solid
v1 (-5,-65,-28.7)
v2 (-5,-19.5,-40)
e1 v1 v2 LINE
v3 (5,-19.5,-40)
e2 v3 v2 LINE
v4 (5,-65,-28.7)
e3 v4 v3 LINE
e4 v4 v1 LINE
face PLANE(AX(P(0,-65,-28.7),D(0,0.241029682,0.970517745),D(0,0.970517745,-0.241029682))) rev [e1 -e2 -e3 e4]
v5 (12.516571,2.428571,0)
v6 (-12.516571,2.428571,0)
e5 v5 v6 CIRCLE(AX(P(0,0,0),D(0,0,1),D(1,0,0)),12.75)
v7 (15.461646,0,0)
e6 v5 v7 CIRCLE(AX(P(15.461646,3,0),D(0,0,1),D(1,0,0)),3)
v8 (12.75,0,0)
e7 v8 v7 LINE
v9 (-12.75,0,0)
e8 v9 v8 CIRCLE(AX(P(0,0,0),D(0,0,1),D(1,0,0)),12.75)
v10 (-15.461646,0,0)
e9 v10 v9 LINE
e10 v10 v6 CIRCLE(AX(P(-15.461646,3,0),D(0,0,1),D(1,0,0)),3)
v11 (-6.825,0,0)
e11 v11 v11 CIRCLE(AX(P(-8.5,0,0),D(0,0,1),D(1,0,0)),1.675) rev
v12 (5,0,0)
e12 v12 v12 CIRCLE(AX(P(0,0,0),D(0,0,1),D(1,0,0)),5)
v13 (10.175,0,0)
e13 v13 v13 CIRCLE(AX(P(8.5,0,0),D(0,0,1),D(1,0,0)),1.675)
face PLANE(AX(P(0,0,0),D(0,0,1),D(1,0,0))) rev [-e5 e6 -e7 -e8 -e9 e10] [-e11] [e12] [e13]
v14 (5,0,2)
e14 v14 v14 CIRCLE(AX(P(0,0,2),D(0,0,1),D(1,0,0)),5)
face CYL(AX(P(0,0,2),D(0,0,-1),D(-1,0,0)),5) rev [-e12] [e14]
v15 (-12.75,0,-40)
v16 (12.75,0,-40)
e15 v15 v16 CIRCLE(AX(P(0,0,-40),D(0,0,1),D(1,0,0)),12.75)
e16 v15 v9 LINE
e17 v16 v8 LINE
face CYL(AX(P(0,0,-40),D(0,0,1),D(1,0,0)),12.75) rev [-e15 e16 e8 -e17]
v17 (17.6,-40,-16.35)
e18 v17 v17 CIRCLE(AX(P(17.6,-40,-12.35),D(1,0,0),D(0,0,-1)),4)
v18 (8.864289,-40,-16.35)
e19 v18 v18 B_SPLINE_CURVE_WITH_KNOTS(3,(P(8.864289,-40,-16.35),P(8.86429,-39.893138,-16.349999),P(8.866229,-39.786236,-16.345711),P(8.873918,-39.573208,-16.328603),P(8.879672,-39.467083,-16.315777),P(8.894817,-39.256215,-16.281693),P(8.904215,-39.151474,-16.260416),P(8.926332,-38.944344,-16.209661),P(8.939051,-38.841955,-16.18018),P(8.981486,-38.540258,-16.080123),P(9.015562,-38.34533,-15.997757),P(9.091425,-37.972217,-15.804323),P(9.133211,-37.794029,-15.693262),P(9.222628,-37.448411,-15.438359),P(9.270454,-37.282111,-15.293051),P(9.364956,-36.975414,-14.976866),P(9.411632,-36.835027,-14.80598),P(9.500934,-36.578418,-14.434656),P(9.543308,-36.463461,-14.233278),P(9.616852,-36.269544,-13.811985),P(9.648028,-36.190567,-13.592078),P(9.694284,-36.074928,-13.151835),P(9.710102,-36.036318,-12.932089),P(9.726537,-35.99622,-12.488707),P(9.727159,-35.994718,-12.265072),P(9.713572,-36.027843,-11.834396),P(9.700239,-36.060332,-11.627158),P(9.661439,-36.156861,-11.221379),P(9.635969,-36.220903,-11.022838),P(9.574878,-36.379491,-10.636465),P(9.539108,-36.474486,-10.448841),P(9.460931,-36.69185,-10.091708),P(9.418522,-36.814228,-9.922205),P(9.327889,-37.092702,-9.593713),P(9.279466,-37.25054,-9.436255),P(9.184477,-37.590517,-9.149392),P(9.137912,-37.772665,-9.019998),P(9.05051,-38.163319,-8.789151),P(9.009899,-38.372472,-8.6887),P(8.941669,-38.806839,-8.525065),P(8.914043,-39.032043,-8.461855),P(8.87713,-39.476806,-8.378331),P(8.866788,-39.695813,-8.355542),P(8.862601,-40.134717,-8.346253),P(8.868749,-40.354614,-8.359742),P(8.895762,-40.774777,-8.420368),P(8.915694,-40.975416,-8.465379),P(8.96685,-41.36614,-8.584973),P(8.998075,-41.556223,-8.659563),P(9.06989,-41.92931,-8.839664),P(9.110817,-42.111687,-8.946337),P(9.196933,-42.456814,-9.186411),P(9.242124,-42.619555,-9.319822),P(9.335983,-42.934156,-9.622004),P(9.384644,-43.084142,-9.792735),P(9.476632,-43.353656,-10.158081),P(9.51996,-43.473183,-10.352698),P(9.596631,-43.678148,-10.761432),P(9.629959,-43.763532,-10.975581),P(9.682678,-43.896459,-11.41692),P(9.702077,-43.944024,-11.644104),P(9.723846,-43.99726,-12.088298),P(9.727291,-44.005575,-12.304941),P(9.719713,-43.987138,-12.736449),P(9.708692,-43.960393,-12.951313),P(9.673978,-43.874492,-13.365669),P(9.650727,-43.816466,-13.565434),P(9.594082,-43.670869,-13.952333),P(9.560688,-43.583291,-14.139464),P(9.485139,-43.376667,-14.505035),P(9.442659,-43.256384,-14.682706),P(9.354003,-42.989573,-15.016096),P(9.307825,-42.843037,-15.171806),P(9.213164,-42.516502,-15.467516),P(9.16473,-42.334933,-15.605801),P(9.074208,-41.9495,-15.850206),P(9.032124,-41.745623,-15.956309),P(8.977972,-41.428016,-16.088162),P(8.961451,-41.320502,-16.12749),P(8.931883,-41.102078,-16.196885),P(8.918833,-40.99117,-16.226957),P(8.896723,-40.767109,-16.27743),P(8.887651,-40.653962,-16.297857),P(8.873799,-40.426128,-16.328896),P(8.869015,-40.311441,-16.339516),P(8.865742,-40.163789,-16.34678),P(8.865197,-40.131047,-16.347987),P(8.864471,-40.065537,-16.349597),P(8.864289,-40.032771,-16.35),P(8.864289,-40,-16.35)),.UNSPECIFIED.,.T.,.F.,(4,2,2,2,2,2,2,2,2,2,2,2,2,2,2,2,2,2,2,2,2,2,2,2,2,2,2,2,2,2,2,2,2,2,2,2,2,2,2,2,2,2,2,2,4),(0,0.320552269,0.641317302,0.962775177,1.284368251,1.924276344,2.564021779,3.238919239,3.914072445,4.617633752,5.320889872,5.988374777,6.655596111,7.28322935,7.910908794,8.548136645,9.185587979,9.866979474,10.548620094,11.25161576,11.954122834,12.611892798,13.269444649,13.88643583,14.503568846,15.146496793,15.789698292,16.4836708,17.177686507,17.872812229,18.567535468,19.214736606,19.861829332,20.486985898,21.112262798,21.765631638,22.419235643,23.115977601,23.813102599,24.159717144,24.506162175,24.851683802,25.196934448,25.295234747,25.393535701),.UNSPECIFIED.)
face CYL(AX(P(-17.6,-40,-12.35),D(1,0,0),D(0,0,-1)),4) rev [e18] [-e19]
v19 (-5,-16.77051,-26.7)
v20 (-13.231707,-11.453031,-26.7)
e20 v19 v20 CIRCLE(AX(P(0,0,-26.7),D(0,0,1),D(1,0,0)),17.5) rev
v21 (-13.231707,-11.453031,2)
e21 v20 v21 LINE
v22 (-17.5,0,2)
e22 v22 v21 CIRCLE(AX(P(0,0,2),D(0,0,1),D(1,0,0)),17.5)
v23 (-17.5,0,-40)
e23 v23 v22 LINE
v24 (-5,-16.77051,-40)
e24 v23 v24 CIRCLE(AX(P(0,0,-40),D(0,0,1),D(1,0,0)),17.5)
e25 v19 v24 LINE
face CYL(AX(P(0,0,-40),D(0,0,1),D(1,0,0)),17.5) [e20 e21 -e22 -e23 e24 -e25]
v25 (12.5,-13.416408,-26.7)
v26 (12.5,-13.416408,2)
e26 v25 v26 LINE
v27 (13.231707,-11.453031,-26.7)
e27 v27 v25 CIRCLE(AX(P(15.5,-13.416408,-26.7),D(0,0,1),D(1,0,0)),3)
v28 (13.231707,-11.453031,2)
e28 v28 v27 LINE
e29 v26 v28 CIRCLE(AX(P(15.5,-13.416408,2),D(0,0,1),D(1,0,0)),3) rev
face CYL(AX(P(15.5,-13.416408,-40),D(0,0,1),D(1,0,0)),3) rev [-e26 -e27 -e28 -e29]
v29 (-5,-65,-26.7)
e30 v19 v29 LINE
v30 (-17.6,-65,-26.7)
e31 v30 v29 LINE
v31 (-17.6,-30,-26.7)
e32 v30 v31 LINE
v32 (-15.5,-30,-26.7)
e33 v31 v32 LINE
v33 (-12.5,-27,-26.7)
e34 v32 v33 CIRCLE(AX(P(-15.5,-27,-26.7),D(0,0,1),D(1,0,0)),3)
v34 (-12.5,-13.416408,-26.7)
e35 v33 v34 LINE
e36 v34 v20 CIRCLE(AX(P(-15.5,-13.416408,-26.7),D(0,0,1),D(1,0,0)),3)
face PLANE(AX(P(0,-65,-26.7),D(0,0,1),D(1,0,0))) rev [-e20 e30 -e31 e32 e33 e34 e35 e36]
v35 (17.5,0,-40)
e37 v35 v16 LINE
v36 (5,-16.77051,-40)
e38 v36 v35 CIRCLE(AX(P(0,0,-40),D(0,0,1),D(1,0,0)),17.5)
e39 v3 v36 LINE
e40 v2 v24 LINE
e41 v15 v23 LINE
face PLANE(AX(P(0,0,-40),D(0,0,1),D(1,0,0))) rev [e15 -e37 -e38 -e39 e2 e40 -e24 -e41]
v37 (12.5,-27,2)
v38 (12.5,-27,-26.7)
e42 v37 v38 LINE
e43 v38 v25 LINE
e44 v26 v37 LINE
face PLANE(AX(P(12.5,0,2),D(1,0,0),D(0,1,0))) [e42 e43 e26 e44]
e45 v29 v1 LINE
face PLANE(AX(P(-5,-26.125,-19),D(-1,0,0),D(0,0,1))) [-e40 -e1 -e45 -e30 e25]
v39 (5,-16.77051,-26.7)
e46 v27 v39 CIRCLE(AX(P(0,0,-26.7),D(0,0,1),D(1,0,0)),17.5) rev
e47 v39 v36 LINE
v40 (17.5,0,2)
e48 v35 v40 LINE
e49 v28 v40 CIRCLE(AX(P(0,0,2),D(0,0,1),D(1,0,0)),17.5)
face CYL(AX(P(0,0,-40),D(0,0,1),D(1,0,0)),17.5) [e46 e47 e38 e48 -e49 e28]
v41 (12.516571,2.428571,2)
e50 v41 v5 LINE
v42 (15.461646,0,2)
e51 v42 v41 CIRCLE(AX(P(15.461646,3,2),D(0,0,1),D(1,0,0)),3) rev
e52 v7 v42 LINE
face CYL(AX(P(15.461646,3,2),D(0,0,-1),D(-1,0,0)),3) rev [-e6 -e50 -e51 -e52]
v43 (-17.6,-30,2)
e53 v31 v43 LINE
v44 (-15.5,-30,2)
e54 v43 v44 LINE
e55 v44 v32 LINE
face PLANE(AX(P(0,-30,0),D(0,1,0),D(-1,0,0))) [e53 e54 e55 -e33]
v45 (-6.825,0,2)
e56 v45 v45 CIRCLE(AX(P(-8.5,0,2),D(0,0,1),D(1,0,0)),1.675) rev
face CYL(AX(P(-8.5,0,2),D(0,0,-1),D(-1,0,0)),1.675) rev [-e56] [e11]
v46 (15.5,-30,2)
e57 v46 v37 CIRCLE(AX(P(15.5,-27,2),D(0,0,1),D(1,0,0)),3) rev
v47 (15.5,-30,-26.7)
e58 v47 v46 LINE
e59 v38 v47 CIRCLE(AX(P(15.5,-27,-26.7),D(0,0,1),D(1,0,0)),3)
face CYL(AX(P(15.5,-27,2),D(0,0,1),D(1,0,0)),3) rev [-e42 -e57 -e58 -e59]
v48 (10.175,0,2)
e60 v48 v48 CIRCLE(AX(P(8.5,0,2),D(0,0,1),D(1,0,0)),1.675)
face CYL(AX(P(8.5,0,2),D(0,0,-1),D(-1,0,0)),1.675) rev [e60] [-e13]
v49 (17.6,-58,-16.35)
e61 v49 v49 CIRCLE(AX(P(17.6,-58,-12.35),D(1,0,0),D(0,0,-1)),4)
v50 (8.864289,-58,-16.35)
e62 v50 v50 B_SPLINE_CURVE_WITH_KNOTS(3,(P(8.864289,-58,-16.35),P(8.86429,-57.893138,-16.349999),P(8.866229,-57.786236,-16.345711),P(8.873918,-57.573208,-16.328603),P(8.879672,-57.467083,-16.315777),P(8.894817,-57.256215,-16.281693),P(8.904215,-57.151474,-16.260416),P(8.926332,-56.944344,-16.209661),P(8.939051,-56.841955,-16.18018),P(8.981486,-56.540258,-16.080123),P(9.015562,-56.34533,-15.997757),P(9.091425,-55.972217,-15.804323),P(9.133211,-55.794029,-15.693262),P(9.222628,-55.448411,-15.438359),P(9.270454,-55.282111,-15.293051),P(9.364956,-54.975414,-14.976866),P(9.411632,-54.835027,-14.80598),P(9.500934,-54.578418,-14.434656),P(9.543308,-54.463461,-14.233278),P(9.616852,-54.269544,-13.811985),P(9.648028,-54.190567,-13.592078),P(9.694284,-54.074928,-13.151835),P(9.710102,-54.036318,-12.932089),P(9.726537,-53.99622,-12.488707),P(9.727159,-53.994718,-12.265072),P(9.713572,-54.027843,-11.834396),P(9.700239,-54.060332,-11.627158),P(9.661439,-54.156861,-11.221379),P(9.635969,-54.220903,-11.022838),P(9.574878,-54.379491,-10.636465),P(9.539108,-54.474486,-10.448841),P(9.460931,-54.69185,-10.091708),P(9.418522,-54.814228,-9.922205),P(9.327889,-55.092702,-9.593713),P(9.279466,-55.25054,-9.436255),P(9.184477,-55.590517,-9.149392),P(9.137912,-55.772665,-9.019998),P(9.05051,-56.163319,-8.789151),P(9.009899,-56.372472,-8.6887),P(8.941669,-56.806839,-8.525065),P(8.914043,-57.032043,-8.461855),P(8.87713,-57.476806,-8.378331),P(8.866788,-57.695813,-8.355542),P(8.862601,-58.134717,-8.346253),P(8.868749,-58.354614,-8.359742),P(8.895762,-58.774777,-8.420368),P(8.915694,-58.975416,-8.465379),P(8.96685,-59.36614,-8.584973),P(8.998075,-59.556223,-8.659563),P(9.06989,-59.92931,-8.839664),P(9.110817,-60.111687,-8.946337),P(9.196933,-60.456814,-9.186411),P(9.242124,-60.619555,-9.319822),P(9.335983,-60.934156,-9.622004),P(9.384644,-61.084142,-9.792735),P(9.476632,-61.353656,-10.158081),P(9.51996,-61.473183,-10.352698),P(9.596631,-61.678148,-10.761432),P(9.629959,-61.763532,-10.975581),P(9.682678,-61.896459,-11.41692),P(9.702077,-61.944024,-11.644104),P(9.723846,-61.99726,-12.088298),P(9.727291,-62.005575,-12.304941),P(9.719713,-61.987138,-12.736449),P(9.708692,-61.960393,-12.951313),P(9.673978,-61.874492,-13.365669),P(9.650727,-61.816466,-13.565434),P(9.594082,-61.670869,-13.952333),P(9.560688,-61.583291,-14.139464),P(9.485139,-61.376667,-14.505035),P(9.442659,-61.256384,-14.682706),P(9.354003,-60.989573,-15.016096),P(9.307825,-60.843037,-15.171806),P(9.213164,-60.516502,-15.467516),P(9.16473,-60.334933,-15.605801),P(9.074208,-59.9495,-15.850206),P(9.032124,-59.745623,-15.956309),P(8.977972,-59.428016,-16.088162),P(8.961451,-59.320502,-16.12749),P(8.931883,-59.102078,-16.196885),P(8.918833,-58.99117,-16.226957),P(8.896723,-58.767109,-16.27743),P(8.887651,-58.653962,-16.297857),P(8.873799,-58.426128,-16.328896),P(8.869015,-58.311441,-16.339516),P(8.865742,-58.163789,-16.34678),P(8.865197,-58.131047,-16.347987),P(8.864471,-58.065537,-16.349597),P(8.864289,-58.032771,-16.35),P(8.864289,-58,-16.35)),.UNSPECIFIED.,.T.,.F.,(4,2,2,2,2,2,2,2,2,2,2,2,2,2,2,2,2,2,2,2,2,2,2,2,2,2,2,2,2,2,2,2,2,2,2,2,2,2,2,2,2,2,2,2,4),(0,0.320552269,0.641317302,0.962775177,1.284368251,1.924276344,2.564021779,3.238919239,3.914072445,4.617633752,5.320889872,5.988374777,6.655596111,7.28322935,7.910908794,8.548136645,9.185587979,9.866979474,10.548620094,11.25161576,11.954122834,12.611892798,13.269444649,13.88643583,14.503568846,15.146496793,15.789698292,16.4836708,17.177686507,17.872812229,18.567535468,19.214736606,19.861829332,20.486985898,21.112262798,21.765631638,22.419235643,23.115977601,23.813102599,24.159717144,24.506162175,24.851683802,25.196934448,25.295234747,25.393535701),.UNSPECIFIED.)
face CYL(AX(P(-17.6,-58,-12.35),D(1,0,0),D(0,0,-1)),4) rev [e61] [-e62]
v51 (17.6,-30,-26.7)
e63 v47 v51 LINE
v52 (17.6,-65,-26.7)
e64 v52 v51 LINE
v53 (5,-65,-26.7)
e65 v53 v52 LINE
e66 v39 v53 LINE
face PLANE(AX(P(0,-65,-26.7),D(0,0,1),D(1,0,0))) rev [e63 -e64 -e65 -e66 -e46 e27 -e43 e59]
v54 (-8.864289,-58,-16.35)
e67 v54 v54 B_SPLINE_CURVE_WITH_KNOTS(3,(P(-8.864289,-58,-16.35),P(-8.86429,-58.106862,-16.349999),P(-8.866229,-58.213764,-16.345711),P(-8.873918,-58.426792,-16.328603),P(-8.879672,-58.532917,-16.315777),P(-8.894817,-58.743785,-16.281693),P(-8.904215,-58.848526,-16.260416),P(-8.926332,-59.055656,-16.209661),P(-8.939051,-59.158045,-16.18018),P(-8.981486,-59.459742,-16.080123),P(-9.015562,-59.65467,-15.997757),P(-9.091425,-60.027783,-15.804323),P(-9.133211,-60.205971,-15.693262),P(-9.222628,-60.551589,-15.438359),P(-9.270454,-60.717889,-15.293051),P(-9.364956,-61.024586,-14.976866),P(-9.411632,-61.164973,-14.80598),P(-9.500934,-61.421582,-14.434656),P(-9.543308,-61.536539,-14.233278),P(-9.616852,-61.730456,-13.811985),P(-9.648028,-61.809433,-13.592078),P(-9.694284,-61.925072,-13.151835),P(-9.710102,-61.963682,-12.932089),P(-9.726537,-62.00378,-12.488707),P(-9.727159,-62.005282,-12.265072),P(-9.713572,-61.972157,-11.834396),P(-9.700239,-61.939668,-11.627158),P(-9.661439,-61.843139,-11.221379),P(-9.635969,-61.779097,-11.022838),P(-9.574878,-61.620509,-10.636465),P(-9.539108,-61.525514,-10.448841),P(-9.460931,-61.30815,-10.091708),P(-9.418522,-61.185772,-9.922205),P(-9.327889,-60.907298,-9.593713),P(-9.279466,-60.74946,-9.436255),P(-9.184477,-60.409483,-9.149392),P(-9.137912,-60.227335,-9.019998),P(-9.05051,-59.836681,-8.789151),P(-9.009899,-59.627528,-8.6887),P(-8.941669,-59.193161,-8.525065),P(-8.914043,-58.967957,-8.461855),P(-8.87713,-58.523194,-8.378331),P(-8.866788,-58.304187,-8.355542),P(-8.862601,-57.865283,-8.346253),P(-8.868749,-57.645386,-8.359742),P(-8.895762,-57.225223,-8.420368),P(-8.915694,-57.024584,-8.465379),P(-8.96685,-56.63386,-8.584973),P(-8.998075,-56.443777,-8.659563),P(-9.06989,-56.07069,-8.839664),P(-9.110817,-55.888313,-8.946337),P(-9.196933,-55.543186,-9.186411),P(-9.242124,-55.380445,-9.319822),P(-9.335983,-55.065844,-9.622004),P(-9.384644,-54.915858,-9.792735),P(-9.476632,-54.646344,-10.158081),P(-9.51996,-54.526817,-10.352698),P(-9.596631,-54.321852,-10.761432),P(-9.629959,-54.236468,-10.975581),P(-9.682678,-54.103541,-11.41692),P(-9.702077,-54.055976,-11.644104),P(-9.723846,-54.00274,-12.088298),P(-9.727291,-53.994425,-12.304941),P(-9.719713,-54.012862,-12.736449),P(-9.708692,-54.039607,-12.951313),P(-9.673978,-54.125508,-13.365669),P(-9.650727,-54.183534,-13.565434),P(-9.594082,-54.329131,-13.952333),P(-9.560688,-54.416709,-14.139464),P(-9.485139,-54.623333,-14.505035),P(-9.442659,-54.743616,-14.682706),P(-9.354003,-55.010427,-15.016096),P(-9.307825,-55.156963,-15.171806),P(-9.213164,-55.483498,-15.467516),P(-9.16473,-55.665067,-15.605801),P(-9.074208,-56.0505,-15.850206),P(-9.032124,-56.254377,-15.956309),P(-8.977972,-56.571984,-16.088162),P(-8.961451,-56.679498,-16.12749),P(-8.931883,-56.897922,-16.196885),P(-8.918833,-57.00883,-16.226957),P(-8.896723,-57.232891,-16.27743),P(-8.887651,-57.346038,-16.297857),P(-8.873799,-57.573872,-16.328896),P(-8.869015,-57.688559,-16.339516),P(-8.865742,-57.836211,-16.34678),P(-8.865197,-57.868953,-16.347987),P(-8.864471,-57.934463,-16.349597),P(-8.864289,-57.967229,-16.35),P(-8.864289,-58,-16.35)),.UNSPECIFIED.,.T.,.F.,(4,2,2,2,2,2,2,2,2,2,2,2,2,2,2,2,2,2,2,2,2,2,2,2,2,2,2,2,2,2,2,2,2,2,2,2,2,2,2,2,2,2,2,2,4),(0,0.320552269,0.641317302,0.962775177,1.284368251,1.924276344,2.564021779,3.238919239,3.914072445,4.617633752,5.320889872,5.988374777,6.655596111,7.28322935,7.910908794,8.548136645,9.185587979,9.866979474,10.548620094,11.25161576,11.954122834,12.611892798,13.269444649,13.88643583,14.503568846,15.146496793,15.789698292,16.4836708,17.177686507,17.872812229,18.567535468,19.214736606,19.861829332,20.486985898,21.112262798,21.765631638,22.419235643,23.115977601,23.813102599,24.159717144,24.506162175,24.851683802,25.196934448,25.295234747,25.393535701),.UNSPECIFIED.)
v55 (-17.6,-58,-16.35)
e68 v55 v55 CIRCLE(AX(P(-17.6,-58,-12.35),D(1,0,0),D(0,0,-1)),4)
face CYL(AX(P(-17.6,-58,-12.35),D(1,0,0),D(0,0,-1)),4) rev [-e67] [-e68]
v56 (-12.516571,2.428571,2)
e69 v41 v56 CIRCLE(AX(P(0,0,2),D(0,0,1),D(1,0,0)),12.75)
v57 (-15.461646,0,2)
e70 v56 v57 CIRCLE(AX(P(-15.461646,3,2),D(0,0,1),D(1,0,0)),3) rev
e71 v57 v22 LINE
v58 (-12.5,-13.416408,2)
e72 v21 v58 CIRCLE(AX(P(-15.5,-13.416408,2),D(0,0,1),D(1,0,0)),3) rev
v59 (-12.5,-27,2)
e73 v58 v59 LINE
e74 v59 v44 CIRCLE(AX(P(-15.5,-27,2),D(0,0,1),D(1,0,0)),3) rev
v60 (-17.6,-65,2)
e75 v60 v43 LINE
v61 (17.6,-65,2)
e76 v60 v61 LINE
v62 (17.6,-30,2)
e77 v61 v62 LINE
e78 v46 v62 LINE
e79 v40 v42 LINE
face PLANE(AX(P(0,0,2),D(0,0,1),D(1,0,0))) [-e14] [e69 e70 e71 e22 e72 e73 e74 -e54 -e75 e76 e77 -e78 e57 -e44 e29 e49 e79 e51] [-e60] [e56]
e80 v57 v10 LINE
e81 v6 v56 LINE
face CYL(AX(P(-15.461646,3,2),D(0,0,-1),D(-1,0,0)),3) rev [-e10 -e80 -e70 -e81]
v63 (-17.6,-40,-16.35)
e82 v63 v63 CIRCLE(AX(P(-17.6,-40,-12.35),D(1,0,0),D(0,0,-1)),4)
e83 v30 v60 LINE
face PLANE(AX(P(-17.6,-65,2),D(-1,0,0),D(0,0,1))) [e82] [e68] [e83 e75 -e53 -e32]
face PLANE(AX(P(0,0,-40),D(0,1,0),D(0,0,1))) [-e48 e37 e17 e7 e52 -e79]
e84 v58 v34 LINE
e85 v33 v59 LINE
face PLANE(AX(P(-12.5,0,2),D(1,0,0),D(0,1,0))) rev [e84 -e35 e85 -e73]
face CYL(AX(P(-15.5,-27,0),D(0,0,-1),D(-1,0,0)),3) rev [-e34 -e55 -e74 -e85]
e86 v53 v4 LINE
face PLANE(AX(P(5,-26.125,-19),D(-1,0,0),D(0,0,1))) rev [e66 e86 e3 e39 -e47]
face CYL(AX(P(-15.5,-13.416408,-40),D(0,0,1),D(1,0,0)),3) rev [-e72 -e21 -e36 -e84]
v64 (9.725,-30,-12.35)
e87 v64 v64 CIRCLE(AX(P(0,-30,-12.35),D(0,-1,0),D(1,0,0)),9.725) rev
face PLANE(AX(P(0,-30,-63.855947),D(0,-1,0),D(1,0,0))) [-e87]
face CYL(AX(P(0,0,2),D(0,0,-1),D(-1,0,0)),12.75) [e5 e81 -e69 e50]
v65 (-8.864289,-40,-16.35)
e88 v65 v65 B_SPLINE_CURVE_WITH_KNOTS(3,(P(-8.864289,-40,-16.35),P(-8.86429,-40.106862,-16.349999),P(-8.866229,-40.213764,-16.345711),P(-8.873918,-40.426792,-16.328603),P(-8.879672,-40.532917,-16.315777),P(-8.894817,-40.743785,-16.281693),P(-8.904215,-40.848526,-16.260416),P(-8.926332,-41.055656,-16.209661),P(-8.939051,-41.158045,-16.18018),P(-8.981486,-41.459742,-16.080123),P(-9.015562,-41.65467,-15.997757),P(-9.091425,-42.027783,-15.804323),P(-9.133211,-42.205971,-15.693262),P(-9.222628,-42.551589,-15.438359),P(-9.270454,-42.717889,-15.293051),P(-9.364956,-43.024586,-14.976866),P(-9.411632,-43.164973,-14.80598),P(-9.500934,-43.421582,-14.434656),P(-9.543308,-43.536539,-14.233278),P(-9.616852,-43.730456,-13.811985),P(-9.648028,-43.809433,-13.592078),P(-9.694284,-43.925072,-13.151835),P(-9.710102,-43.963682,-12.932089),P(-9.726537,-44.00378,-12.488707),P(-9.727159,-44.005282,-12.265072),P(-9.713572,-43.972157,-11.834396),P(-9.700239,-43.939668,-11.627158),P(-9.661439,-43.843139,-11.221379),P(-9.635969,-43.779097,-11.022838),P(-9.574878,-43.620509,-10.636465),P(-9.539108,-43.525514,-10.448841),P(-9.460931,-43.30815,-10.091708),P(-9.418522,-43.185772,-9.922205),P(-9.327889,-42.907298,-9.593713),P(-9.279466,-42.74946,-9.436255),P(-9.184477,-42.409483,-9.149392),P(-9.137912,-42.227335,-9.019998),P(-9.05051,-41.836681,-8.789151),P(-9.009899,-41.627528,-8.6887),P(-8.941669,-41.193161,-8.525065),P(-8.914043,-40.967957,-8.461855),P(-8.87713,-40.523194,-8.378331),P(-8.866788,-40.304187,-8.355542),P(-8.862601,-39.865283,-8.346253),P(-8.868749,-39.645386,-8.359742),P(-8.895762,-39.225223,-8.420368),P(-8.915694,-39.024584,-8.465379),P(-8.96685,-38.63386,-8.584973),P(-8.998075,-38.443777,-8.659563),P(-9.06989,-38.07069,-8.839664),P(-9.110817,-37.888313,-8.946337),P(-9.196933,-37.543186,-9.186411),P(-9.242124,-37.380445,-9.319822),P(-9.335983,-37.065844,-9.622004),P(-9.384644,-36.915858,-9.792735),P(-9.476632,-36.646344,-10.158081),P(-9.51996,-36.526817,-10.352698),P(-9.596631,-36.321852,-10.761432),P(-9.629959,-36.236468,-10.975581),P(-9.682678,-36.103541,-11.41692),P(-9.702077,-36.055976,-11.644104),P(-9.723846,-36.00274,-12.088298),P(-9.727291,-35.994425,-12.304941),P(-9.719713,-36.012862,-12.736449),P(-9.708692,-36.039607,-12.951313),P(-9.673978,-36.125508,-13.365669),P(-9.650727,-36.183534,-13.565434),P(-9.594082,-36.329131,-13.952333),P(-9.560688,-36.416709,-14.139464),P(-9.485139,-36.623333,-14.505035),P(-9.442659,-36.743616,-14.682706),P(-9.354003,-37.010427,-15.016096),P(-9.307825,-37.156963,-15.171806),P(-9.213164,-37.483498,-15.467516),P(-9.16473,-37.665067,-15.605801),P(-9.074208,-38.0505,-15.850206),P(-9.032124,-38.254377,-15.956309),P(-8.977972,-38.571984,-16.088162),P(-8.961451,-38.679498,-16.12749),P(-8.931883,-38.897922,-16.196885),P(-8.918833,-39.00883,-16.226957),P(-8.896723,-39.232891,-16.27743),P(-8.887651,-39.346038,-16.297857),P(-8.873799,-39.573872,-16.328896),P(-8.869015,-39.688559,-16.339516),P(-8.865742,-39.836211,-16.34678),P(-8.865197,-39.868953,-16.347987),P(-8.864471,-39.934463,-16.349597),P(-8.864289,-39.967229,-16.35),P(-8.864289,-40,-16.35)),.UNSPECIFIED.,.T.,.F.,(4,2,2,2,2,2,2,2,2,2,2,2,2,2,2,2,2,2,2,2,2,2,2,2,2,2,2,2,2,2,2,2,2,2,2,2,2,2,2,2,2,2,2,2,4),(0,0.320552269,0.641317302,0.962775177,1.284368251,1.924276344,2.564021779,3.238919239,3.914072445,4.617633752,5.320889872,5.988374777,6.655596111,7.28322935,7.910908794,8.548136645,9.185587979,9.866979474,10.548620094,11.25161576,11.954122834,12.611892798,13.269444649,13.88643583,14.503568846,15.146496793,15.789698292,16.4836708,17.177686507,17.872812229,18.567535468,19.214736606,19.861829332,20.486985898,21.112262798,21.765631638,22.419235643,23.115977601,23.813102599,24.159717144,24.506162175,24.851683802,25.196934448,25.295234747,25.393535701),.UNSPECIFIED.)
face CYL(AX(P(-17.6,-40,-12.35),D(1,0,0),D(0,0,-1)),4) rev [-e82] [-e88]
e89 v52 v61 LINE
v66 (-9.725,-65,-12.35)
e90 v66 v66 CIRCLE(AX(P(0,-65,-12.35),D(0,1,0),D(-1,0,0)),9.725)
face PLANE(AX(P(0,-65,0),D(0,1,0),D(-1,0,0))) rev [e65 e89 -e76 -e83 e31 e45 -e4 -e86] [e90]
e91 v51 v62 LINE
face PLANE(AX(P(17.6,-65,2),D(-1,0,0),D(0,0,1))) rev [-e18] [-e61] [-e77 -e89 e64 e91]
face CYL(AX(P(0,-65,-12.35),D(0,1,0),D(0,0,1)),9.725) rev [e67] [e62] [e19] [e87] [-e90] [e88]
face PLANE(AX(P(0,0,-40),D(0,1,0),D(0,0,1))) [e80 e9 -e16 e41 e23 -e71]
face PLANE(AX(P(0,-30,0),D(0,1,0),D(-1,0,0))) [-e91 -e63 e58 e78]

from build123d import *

# Parameters (mm, degrees)
SKETCH2_R               = 12.75
SKETCH2_R_2             = 5
SKETCH2_R_3             = 1.675
BOSS_EXTRUDE3_DEPTH     = 2
BOSS_EXTRUDE4_START     = -40
BOSS_EXTRUDE4_DEPTH     = 42
BOSS_EXTRUDE6_START     = -30
SKETCH7_W               = 35.2
SKETCH7_H               = 28.7
SKETCH7_R               = 9.725
BOSS_EXTRUDE6_DEPTH     = 35
BOSS_EXTRUDE7_START     = -26.7
BOSS_EXTRUDE7_DEPTH     = 26.7
CUT_EXTRUDE1_DEPTH      = 79.324708745
CUT_EXTRUDE1_DEPTH_BACK = 79.324708745
SKETCH6_R               = 4
RIB3_START              = -5
RIB3_DEPTH              = 10
FILLET2_R               = 3


with BuildPart() as part:
    # Sketch2 → Boss-Extrude3 (new body)
    # profile 1 of 2: a face of its own
    with BuildSketch(Plane.XY):
        Circle(SKETCH2_R)
        Circle(SKETCH2_R_2, mode=Mode.SUBTRACT)
        with Locations((8.5, 0)):
            Circle(SKETCH2_R_3, mode=Mode.SUBTRACT)
        with Locations((-8.5, 0)):
            Circle(SKETCH2_R_3, mode=Mode.SUBTRACT)
    # profile 2 of 2: a face of its own
    with BuildSketch(Plane.XY):
        with BuildLine():
            Line((12.5, -30), (12.5, -2.512468905))
            ThreePointArc((12.5, -2.512468905), (0, -12.75), (-12.5, -2.512468905))
            Line((-12.5, -2.512468905), (-12.5, -30))
            Line((-12.5, -30), (12.5, -30))
        make_face()
    extrude(amount=BOSS_EXTRUDE3_DEPTH)

    # Sketch3 → Boss-Extrude4 (add)
    with BuildSketch(Plane.XY.offset(BOSS_EXTRUDE4_START)):
        with BuildLine():
            Line((17.5, 0), (12.75, 0))
            ThreePointArc((12.75, 0), (0, -12.75), (-12.75, 0))
            Line((-12.75, 0), (-17.5, 0))
            ThreePointArc((-17.5, 0), (0, -17.5), (17.5, 0))
        make_face()
    extrude(amount=BOSS_EXTRUDE4_DEPTH)

    # Sketch7 → Boss-Extrude6 (add)
    with BuildSketch(Plane(origin=(0, 0, 0), x_dir=(1, 0, 0), z_dir=(0, 1, 0)).offset(BOSS_EXTRUDE6_START)):
        with Locations((0, 12.35)):
            Rectangle(SKETCH7_W, SKETCH7_H)
        with Locations(Location((0, 12.35, 0), (0, 0, 180))):
            Circle(SKETCH7_R, mode=Mode.SUBTRACT)
    extrude(amount=-BOSS_EXTRUDE6_DEPTH)

    # Sketch2<8> → Boss-Extrude7 (add)
    with BuildSketch(Plane.XY.offset(BOSS_EXTRUDE7_START)):
        with BuildLine():
            Line((12.5, -30), (12.5, -2.512468905))
            ThreePointArc((12.5, -2.512468905), (0, -12.75), (-12.5, -2.512468905))
            Line((-12.5, -2.512468905), (-12.5, -30))
            Line((-12.5, -30), (12.5, -30))
        make_face()
    extrude(amount=BOSS_EXTRUDE7_DEPTH)

    # Sketch6 → Cut-Extrude1 (cut, two sides: drawn at the far end of the back side and taken through both)
    with BuildSketch(Plane(origin=(0, 0, 0), x_dir=(0, 0, -1), z_dir=(1, 0, 0)).offset(-CUT_EXTRUDE1_DEPTH_BACK)):
        with Locations((12.35, -40)):
            Circle(SKETCH6_R)
        with Locations((12.35, -58)):
            Circle(SKETCH6_R)
    extrude(amount=CUT_EXTRUDE1_DEPTH + CUT_EXTRUDE1_DEPTH_BACK, mode=Mode.SUBTRACT)

    # Rib3: read off the stored shape, not the designer's step
    # Rib3 outline → Rib3 (add)
    with BuildSketch(Plane(origin=(0, -60, 0), x_dir=(0, -1, 0), z_dir=(-1, 0, 0)).offset(RIB3_START)):
        Polygon((5, -28.7), (5, -26.7), (-43.229490169, -26.7), (-43.229490169, -40), (-40.5, -40), align=None)
    extrude(amount=RIB3_DEPTH)

    # Fillet2
    fillet2_edges = [part.edges().sort_by_distance(p)[0] for p in [
        (12.5, -30, -12.35),
        (-12.5, -30, -12.35),
        (-12.75, 0, 1),
        (12.5, -12.247448714, -12.35),
        (12.75, 0, 1),
        (-12.5, -12.247448714, -12.35),
    ]]
    fillet(fillet2_edges, radius=FILLET2_R)


solid = part.part
